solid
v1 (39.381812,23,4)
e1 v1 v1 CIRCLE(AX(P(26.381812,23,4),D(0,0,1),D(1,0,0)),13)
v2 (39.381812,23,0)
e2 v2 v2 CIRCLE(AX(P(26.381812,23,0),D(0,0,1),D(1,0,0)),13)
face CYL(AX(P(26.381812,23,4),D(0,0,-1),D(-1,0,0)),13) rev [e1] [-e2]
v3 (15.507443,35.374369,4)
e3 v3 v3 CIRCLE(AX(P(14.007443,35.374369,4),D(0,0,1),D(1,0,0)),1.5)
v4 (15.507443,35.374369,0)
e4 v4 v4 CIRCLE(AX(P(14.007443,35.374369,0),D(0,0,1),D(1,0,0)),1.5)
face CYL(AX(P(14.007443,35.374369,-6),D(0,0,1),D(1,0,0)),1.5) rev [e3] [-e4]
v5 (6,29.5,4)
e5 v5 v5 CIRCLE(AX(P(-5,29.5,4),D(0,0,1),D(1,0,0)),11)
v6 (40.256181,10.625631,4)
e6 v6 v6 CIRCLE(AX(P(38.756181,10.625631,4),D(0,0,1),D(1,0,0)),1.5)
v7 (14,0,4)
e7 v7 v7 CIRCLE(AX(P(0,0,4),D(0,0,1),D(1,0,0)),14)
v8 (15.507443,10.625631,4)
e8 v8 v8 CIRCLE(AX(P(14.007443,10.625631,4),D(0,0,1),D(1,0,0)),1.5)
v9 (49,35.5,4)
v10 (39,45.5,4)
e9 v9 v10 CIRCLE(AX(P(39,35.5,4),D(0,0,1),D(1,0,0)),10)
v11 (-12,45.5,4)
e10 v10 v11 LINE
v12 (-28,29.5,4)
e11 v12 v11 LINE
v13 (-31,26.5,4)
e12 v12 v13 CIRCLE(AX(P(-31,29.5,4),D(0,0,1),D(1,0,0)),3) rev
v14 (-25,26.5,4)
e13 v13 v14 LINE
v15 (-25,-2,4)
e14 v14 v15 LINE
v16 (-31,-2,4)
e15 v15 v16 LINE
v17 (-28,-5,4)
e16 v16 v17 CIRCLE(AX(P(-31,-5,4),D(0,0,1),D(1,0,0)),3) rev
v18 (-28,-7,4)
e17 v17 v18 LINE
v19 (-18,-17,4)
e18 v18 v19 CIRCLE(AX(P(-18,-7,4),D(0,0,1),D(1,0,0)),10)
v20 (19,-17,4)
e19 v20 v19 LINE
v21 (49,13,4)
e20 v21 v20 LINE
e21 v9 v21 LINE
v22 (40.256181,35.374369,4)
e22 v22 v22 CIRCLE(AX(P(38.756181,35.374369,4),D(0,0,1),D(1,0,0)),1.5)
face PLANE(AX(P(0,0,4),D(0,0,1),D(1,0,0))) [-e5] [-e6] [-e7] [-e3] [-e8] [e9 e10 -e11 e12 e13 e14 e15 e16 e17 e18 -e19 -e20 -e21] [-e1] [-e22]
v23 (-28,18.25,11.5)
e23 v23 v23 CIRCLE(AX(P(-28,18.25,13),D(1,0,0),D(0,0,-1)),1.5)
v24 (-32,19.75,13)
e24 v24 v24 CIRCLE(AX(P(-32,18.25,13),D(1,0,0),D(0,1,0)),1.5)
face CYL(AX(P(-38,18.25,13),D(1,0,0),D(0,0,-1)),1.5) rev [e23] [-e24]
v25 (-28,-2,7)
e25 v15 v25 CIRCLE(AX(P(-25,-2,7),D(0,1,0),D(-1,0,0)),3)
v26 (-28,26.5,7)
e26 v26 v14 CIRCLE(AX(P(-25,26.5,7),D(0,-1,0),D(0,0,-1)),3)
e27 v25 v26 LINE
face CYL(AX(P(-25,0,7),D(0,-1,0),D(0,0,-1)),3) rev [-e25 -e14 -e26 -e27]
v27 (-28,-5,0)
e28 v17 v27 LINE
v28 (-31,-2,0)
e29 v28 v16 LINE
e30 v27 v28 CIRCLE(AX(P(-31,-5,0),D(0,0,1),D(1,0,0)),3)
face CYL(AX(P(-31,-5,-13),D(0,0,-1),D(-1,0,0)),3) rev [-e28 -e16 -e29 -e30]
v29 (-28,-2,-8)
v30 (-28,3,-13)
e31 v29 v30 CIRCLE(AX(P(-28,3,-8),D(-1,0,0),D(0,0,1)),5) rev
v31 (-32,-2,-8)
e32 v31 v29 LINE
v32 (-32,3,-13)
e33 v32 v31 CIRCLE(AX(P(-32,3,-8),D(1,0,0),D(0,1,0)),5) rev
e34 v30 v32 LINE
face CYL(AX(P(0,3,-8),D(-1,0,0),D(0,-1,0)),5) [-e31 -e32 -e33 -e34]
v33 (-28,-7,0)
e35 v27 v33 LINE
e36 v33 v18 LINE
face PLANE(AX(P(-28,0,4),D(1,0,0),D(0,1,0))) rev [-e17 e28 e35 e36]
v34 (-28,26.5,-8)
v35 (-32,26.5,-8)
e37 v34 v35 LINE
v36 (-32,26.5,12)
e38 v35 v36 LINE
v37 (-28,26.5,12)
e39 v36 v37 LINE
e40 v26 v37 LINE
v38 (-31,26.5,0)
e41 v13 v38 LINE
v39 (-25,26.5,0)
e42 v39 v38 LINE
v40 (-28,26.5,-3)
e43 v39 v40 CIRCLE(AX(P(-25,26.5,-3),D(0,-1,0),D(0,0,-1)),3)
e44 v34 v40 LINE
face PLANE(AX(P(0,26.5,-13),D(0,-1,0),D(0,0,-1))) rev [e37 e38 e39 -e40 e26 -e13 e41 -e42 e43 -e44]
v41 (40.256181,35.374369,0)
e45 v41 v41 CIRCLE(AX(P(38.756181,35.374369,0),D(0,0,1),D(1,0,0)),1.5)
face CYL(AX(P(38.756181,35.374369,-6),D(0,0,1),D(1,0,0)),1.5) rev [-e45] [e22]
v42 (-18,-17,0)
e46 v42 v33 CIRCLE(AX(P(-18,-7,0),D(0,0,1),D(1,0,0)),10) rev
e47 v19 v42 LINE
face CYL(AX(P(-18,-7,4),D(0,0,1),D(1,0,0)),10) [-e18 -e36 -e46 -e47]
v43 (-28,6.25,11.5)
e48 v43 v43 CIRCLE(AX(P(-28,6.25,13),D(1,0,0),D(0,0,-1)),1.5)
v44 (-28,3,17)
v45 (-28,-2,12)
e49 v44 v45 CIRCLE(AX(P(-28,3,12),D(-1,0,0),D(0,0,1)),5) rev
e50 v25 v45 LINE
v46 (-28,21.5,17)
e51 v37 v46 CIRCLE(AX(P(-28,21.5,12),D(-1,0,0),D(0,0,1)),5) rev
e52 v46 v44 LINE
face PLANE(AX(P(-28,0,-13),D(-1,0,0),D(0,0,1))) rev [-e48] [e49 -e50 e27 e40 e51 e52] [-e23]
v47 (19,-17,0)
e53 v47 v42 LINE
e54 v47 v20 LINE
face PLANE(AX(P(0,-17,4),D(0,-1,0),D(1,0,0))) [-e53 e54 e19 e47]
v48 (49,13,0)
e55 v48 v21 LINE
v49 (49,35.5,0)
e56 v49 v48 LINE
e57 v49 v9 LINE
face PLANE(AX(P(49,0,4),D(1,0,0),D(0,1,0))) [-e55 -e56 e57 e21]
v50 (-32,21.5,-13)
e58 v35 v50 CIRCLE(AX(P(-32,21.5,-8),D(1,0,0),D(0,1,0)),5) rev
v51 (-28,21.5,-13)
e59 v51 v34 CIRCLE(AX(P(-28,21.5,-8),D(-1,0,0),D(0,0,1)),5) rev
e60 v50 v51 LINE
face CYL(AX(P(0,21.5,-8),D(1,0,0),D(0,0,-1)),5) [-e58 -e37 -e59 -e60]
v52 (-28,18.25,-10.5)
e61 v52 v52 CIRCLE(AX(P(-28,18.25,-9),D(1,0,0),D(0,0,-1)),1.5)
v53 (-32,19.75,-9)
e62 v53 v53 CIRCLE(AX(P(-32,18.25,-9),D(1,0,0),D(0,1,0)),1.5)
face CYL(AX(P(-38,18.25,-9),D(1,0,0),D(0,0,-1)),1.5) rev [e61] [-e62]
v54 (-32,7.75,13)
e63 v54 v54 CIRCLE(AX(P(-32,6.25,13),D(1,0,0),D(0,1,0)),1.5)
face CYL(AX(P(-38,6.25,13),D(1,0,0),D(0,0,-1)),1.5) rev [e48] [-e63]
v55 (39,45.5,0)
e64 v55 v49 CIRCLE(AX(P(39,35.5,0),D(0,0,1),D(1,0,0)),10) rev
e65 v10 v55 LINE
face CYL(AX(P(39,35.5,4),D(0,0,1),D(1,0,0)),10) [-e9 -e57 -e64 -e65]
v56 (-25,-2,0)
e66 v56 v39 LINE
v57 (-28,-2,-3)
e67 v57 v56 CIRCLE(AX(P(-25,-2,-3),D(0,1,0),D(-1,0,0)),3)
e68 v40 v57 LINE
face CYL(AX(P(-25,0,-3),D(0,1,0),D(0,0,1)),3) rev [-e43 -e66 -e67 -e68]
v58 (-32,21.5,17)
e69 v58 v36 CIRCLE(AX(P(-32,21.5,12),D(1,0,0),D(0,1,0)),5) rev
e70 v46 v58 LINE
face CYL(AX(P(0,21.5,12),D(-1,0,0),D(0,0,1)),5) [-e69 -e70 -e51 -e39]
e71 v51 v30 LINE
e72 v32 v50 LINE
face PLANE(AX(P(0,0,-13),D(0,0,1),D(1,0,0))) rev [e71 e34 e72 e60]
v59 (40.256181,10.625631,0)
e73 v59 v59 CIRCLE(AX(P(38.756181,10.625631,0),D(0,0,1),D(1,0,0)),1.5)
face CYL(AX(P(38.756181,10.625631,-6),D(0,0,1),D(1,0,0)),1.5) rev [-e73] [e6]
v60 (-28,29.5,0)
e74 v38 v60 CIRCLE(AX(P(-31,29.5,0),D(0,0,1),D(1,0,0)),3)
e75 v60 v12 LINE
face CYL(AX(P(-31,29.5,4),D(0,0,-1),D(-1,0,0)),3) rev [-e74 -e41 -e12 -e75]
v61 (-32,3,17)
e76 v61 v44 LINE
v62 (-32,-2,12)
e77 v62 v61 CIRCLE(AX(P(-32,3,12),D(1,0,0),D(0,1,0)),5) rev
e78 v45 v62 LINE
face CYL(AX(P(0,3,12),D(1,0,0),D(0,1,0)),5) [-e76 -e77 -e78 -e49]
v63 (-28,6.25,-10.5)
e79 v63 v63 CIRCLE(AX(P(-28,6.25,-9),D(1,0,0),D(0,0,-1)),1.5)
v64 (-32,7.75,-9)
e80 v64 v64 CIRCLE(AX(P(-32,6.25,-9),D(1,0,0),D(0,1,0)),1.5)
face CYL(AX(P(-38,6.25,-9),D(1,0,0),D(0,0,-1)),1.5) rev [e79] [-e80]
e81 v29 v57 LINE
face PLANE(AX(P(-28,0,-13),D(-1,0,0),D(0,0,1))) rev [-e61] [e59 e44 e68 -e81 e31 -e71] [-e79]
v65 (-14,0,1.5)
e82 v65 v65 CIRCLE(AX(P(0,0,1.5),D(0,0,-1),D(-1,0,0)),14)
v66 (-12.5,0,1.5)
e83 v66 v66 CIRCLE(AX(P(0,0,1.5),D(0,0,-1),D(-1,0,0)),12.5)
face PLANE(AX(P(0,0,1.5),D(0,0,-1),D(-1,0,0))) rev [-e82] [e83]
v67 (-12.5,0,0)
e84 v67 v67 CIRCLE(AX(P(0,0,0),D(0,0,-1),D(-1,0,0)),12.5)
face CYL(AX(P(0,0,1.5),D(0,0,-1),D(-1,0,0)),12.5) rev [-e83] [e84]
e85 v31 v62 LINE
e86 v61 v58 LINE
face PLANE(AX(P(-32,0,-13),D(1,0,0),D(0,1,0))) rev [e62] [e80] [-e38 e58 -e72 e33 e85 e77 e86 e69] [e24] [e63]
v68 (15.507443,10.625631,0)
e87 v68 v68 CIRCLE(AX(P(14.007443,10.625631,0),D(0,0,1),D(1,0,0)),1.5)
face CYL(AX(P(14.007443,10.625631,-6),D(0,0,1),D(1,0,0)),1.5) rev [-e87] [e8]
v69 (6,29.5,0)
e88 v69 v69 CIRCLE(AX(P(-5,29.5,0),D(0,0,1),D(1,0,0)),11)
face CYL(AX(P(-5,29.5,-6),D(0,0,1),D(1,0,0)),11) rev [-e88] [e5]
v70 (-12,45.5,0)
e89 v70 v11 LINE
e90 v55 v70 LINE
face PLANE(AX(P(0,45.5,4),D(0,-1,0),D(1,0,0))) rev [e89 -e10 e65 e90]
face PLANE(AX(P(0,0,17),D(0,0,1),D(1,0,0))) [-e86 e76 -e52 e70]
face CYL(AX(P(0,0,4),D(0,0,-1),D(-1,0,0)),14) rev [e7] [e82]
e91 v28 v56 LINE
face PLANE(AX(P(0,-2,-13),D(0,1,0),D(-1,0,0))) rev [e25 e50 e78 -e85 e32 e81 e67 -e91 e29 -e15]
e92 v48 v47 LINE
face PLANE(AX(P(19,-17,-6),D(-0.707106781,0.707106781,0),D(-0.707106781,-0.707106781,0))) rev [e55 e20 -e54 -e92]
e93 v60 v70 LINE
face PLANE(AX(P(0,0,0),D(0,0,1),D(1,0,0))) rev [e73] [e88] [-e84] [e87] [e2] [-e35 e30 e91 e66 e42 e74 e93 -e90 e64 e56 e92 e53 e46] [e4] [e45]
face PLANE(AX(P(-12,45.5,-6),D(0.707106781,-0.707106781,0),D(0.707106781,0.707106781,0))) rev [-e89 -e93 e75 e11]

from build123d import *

# Parameters (mm, degrees)
SKETCH_1_W           = 77
SKETCH_1_H           = 62.5
SKETCH_1_R           = 14
SKETCH_1_R_2         = 13
EXTRUDE_1_DEPTH      = 4
EXTRUDE_2_DEPTH      = 17
EXTRUDE_2_DEPTH_BACK = 13
FILLET_1_R           = 3
SKETCH_4_W           = 20
SKETCH_4_H           = 28.5
CUT_EXTRUDE_3_DEPTH  = 74
SKETCH_9_R           = 1.5
CUT_EXTRUDE_6_DEPTH  = 10
SKETCH_10_R          = 1.5
CUT_EXTRUDE_7_DEPTH  = 10
FILLET_2_R           = 5
CUT_EXTRUDE_8_DEPTH  = 10
FILLET_3_R           = 10
FILLET_4_R           = 3
SKETCH_13_R          = 14
SKETCH_13_R_2        = 12.5
EXTRUDE_3_DEPTH      = 1.5
SKETCH_14_R          = 11
CUT_EXTRUDE_9_DEPTH  = 10


with BuildPart() as part:
    # 草图1 → 凸台-拉伸1 (new body)
    with BuildSketch(Plane.XY):
        with Locations((10.5, 14.25)):
            Rectangle(SKETCH_1_W, SKETCH_1_H)
        Circle(SKETCH_1_R, mode=Mode.SUBTRACT)
        with Locations((26.381811917, 23)):
            Circle(SKETCH_1_R_2, mode=Mode.SUBTRACT)
    extrude(amount=EXTRUDE_1_DEPTH)

    # 草图1<3> → 凸台-拉伸2 (add, two sides: drawn at the far end of the back side and taken through both)
    with BuildSketch(Plane.XY.offset(-EXTRUDE_2_DEPTH_BACK)):
        Polygon((-52, 22.5), (-52, 26.5), (-28, 26.5), (-28, -2), (-52, -2), (-52, 2), (-32, 2), (-32, 22.5), align=None)
    extrude(amount=EXTRUDE_2_DEPTH + EXTRUDE_2_DEPTH_BACK)

    # 圆角1
    fillet_1_edges = [part.edges().sort_by_distance(p)[0] for p in [
        (-28, 12.25, 0),
        (-28, 12.25, 4),
    ]]
    fillet(fillet_1_edges, radius=FILLET_1_R)

    # 草图4 → 切除-拉伸3 (cut)
    with BuildSketch(Plane.XY.offset(17)):
        with Locations((-42, 12.25)):
            Rectangle(SKETCH_4_W, SKETCH_4_H)
    extrude(amount=-CUT_EXTRUDE_3_DEPTH, mode=Mode.SUBTRACT)

    # 草图9 → 切除-拉伸6 (cut)
    with BuildSketch(Plane.XY.offset(4)):
        with Locations((38.756180587, 35.374368671)):
            Circle(SKETCH_9_R)
        with Locations((38.756180587, 10.625631329)):
            Circle(SKETCH_9_R)
        with Locations((14.007443246, 10.625631329)):
            Circle(SKETCH_9_R)
        with Locations((14.007443246, 35.374368671)):
            Circle(SKETCH_9_R)
    extrude(amount=-CUT_EXTRUDE_6_DEPTH, mode=Mode.SUBTRACT)

    # 草图10 → 切除-拉伸7 (cut)
    with BuildSketch(Plane(origin=(-28, 0, 0), x_dir=(0, 0, -1), z_dir=(1, 0, 0))):
        with Locations((-13, 18.25)):
            Circle(SKETCH_10_R)
        with Locations((-13, 6.25)):
            Circle(SKETCH_10_R)
        with Locations((9, 18.25)):
            Circle(SKETCH_10_R)
        with Locations((9, 6.25)):
            Circle(SKETCH_10_R)
    extrude(amount=-CUT_EXTRUDE_7_DEPTH, mode=Mode.SUBTRACT)

    # 圆角2
    fillet_2_edges = [part.edges().sort_by_distance(p)[0] for p in [
        (-30, -2, 17),
        (-30, -2, -13),
        (-30, 26.5, 17),
        (-30, 26.5, -13),
    ]]
    fillet(fillet_2_edges, radius=FILLET_2_R)

    # 草图11 → 切除-拉伸8 (cut)
    with BuildSketch(Plane.XY.offset(4)):
        Polygon((-28, 29.5), (-28, 45.5), (-12, 45.5), align=None)
        Polygon((19, -17), (49, 13), (49, -17), align=None)
    extrude(amount=-CUT_EXTRUDE_8_DEPTH, mode=Mode.SUBTRACT)

    # 圆角3
    fillet_3_edges = [part.edges().sort_by_distance(p)[0] for p in [
        (-28, -17, 2),
        (49, 45.5, 2),
    ]]
    fillet(fillet_3_edges, radius=FILLET_3_R)

    # 圆角4
    fillet_4_edges = [part.edges().sort_by_distance(p)[0] for p in [
        (-28, -2, 2),
        (-28, 26.5, 2),
    ]]
    fillet(fillet_4_edges, radius=FILLET_4_R - 0.0001)  # a hair under: the kernel refuses the full size

    # 草图13 → 凸台-拉伸3 (add)
    with BuildSketch(Plane(origin=(0, 0, 0), x_dir=(-1, 0, 0), z_dir=(0, 0, -1))):
        Circle(SKETCH_13_R)
        Circle(SKETCH_13_R_2, mode=Mode.SUBTRACT)
    extrude(amount=-EXTRUDE_3_DEPTH)

    # 草图14 → 切除-拉伸9 (cut)
    with BuildSketch(Plane.XY.offset(4)):
        with Locations((-5, 29.5)):
            Circle(SKETCH_14_R)
    extrude(amount=-CUT_EXTRUDE_9_DEPTH, mode=Mode.SUBTRACT)


solid = part.part
